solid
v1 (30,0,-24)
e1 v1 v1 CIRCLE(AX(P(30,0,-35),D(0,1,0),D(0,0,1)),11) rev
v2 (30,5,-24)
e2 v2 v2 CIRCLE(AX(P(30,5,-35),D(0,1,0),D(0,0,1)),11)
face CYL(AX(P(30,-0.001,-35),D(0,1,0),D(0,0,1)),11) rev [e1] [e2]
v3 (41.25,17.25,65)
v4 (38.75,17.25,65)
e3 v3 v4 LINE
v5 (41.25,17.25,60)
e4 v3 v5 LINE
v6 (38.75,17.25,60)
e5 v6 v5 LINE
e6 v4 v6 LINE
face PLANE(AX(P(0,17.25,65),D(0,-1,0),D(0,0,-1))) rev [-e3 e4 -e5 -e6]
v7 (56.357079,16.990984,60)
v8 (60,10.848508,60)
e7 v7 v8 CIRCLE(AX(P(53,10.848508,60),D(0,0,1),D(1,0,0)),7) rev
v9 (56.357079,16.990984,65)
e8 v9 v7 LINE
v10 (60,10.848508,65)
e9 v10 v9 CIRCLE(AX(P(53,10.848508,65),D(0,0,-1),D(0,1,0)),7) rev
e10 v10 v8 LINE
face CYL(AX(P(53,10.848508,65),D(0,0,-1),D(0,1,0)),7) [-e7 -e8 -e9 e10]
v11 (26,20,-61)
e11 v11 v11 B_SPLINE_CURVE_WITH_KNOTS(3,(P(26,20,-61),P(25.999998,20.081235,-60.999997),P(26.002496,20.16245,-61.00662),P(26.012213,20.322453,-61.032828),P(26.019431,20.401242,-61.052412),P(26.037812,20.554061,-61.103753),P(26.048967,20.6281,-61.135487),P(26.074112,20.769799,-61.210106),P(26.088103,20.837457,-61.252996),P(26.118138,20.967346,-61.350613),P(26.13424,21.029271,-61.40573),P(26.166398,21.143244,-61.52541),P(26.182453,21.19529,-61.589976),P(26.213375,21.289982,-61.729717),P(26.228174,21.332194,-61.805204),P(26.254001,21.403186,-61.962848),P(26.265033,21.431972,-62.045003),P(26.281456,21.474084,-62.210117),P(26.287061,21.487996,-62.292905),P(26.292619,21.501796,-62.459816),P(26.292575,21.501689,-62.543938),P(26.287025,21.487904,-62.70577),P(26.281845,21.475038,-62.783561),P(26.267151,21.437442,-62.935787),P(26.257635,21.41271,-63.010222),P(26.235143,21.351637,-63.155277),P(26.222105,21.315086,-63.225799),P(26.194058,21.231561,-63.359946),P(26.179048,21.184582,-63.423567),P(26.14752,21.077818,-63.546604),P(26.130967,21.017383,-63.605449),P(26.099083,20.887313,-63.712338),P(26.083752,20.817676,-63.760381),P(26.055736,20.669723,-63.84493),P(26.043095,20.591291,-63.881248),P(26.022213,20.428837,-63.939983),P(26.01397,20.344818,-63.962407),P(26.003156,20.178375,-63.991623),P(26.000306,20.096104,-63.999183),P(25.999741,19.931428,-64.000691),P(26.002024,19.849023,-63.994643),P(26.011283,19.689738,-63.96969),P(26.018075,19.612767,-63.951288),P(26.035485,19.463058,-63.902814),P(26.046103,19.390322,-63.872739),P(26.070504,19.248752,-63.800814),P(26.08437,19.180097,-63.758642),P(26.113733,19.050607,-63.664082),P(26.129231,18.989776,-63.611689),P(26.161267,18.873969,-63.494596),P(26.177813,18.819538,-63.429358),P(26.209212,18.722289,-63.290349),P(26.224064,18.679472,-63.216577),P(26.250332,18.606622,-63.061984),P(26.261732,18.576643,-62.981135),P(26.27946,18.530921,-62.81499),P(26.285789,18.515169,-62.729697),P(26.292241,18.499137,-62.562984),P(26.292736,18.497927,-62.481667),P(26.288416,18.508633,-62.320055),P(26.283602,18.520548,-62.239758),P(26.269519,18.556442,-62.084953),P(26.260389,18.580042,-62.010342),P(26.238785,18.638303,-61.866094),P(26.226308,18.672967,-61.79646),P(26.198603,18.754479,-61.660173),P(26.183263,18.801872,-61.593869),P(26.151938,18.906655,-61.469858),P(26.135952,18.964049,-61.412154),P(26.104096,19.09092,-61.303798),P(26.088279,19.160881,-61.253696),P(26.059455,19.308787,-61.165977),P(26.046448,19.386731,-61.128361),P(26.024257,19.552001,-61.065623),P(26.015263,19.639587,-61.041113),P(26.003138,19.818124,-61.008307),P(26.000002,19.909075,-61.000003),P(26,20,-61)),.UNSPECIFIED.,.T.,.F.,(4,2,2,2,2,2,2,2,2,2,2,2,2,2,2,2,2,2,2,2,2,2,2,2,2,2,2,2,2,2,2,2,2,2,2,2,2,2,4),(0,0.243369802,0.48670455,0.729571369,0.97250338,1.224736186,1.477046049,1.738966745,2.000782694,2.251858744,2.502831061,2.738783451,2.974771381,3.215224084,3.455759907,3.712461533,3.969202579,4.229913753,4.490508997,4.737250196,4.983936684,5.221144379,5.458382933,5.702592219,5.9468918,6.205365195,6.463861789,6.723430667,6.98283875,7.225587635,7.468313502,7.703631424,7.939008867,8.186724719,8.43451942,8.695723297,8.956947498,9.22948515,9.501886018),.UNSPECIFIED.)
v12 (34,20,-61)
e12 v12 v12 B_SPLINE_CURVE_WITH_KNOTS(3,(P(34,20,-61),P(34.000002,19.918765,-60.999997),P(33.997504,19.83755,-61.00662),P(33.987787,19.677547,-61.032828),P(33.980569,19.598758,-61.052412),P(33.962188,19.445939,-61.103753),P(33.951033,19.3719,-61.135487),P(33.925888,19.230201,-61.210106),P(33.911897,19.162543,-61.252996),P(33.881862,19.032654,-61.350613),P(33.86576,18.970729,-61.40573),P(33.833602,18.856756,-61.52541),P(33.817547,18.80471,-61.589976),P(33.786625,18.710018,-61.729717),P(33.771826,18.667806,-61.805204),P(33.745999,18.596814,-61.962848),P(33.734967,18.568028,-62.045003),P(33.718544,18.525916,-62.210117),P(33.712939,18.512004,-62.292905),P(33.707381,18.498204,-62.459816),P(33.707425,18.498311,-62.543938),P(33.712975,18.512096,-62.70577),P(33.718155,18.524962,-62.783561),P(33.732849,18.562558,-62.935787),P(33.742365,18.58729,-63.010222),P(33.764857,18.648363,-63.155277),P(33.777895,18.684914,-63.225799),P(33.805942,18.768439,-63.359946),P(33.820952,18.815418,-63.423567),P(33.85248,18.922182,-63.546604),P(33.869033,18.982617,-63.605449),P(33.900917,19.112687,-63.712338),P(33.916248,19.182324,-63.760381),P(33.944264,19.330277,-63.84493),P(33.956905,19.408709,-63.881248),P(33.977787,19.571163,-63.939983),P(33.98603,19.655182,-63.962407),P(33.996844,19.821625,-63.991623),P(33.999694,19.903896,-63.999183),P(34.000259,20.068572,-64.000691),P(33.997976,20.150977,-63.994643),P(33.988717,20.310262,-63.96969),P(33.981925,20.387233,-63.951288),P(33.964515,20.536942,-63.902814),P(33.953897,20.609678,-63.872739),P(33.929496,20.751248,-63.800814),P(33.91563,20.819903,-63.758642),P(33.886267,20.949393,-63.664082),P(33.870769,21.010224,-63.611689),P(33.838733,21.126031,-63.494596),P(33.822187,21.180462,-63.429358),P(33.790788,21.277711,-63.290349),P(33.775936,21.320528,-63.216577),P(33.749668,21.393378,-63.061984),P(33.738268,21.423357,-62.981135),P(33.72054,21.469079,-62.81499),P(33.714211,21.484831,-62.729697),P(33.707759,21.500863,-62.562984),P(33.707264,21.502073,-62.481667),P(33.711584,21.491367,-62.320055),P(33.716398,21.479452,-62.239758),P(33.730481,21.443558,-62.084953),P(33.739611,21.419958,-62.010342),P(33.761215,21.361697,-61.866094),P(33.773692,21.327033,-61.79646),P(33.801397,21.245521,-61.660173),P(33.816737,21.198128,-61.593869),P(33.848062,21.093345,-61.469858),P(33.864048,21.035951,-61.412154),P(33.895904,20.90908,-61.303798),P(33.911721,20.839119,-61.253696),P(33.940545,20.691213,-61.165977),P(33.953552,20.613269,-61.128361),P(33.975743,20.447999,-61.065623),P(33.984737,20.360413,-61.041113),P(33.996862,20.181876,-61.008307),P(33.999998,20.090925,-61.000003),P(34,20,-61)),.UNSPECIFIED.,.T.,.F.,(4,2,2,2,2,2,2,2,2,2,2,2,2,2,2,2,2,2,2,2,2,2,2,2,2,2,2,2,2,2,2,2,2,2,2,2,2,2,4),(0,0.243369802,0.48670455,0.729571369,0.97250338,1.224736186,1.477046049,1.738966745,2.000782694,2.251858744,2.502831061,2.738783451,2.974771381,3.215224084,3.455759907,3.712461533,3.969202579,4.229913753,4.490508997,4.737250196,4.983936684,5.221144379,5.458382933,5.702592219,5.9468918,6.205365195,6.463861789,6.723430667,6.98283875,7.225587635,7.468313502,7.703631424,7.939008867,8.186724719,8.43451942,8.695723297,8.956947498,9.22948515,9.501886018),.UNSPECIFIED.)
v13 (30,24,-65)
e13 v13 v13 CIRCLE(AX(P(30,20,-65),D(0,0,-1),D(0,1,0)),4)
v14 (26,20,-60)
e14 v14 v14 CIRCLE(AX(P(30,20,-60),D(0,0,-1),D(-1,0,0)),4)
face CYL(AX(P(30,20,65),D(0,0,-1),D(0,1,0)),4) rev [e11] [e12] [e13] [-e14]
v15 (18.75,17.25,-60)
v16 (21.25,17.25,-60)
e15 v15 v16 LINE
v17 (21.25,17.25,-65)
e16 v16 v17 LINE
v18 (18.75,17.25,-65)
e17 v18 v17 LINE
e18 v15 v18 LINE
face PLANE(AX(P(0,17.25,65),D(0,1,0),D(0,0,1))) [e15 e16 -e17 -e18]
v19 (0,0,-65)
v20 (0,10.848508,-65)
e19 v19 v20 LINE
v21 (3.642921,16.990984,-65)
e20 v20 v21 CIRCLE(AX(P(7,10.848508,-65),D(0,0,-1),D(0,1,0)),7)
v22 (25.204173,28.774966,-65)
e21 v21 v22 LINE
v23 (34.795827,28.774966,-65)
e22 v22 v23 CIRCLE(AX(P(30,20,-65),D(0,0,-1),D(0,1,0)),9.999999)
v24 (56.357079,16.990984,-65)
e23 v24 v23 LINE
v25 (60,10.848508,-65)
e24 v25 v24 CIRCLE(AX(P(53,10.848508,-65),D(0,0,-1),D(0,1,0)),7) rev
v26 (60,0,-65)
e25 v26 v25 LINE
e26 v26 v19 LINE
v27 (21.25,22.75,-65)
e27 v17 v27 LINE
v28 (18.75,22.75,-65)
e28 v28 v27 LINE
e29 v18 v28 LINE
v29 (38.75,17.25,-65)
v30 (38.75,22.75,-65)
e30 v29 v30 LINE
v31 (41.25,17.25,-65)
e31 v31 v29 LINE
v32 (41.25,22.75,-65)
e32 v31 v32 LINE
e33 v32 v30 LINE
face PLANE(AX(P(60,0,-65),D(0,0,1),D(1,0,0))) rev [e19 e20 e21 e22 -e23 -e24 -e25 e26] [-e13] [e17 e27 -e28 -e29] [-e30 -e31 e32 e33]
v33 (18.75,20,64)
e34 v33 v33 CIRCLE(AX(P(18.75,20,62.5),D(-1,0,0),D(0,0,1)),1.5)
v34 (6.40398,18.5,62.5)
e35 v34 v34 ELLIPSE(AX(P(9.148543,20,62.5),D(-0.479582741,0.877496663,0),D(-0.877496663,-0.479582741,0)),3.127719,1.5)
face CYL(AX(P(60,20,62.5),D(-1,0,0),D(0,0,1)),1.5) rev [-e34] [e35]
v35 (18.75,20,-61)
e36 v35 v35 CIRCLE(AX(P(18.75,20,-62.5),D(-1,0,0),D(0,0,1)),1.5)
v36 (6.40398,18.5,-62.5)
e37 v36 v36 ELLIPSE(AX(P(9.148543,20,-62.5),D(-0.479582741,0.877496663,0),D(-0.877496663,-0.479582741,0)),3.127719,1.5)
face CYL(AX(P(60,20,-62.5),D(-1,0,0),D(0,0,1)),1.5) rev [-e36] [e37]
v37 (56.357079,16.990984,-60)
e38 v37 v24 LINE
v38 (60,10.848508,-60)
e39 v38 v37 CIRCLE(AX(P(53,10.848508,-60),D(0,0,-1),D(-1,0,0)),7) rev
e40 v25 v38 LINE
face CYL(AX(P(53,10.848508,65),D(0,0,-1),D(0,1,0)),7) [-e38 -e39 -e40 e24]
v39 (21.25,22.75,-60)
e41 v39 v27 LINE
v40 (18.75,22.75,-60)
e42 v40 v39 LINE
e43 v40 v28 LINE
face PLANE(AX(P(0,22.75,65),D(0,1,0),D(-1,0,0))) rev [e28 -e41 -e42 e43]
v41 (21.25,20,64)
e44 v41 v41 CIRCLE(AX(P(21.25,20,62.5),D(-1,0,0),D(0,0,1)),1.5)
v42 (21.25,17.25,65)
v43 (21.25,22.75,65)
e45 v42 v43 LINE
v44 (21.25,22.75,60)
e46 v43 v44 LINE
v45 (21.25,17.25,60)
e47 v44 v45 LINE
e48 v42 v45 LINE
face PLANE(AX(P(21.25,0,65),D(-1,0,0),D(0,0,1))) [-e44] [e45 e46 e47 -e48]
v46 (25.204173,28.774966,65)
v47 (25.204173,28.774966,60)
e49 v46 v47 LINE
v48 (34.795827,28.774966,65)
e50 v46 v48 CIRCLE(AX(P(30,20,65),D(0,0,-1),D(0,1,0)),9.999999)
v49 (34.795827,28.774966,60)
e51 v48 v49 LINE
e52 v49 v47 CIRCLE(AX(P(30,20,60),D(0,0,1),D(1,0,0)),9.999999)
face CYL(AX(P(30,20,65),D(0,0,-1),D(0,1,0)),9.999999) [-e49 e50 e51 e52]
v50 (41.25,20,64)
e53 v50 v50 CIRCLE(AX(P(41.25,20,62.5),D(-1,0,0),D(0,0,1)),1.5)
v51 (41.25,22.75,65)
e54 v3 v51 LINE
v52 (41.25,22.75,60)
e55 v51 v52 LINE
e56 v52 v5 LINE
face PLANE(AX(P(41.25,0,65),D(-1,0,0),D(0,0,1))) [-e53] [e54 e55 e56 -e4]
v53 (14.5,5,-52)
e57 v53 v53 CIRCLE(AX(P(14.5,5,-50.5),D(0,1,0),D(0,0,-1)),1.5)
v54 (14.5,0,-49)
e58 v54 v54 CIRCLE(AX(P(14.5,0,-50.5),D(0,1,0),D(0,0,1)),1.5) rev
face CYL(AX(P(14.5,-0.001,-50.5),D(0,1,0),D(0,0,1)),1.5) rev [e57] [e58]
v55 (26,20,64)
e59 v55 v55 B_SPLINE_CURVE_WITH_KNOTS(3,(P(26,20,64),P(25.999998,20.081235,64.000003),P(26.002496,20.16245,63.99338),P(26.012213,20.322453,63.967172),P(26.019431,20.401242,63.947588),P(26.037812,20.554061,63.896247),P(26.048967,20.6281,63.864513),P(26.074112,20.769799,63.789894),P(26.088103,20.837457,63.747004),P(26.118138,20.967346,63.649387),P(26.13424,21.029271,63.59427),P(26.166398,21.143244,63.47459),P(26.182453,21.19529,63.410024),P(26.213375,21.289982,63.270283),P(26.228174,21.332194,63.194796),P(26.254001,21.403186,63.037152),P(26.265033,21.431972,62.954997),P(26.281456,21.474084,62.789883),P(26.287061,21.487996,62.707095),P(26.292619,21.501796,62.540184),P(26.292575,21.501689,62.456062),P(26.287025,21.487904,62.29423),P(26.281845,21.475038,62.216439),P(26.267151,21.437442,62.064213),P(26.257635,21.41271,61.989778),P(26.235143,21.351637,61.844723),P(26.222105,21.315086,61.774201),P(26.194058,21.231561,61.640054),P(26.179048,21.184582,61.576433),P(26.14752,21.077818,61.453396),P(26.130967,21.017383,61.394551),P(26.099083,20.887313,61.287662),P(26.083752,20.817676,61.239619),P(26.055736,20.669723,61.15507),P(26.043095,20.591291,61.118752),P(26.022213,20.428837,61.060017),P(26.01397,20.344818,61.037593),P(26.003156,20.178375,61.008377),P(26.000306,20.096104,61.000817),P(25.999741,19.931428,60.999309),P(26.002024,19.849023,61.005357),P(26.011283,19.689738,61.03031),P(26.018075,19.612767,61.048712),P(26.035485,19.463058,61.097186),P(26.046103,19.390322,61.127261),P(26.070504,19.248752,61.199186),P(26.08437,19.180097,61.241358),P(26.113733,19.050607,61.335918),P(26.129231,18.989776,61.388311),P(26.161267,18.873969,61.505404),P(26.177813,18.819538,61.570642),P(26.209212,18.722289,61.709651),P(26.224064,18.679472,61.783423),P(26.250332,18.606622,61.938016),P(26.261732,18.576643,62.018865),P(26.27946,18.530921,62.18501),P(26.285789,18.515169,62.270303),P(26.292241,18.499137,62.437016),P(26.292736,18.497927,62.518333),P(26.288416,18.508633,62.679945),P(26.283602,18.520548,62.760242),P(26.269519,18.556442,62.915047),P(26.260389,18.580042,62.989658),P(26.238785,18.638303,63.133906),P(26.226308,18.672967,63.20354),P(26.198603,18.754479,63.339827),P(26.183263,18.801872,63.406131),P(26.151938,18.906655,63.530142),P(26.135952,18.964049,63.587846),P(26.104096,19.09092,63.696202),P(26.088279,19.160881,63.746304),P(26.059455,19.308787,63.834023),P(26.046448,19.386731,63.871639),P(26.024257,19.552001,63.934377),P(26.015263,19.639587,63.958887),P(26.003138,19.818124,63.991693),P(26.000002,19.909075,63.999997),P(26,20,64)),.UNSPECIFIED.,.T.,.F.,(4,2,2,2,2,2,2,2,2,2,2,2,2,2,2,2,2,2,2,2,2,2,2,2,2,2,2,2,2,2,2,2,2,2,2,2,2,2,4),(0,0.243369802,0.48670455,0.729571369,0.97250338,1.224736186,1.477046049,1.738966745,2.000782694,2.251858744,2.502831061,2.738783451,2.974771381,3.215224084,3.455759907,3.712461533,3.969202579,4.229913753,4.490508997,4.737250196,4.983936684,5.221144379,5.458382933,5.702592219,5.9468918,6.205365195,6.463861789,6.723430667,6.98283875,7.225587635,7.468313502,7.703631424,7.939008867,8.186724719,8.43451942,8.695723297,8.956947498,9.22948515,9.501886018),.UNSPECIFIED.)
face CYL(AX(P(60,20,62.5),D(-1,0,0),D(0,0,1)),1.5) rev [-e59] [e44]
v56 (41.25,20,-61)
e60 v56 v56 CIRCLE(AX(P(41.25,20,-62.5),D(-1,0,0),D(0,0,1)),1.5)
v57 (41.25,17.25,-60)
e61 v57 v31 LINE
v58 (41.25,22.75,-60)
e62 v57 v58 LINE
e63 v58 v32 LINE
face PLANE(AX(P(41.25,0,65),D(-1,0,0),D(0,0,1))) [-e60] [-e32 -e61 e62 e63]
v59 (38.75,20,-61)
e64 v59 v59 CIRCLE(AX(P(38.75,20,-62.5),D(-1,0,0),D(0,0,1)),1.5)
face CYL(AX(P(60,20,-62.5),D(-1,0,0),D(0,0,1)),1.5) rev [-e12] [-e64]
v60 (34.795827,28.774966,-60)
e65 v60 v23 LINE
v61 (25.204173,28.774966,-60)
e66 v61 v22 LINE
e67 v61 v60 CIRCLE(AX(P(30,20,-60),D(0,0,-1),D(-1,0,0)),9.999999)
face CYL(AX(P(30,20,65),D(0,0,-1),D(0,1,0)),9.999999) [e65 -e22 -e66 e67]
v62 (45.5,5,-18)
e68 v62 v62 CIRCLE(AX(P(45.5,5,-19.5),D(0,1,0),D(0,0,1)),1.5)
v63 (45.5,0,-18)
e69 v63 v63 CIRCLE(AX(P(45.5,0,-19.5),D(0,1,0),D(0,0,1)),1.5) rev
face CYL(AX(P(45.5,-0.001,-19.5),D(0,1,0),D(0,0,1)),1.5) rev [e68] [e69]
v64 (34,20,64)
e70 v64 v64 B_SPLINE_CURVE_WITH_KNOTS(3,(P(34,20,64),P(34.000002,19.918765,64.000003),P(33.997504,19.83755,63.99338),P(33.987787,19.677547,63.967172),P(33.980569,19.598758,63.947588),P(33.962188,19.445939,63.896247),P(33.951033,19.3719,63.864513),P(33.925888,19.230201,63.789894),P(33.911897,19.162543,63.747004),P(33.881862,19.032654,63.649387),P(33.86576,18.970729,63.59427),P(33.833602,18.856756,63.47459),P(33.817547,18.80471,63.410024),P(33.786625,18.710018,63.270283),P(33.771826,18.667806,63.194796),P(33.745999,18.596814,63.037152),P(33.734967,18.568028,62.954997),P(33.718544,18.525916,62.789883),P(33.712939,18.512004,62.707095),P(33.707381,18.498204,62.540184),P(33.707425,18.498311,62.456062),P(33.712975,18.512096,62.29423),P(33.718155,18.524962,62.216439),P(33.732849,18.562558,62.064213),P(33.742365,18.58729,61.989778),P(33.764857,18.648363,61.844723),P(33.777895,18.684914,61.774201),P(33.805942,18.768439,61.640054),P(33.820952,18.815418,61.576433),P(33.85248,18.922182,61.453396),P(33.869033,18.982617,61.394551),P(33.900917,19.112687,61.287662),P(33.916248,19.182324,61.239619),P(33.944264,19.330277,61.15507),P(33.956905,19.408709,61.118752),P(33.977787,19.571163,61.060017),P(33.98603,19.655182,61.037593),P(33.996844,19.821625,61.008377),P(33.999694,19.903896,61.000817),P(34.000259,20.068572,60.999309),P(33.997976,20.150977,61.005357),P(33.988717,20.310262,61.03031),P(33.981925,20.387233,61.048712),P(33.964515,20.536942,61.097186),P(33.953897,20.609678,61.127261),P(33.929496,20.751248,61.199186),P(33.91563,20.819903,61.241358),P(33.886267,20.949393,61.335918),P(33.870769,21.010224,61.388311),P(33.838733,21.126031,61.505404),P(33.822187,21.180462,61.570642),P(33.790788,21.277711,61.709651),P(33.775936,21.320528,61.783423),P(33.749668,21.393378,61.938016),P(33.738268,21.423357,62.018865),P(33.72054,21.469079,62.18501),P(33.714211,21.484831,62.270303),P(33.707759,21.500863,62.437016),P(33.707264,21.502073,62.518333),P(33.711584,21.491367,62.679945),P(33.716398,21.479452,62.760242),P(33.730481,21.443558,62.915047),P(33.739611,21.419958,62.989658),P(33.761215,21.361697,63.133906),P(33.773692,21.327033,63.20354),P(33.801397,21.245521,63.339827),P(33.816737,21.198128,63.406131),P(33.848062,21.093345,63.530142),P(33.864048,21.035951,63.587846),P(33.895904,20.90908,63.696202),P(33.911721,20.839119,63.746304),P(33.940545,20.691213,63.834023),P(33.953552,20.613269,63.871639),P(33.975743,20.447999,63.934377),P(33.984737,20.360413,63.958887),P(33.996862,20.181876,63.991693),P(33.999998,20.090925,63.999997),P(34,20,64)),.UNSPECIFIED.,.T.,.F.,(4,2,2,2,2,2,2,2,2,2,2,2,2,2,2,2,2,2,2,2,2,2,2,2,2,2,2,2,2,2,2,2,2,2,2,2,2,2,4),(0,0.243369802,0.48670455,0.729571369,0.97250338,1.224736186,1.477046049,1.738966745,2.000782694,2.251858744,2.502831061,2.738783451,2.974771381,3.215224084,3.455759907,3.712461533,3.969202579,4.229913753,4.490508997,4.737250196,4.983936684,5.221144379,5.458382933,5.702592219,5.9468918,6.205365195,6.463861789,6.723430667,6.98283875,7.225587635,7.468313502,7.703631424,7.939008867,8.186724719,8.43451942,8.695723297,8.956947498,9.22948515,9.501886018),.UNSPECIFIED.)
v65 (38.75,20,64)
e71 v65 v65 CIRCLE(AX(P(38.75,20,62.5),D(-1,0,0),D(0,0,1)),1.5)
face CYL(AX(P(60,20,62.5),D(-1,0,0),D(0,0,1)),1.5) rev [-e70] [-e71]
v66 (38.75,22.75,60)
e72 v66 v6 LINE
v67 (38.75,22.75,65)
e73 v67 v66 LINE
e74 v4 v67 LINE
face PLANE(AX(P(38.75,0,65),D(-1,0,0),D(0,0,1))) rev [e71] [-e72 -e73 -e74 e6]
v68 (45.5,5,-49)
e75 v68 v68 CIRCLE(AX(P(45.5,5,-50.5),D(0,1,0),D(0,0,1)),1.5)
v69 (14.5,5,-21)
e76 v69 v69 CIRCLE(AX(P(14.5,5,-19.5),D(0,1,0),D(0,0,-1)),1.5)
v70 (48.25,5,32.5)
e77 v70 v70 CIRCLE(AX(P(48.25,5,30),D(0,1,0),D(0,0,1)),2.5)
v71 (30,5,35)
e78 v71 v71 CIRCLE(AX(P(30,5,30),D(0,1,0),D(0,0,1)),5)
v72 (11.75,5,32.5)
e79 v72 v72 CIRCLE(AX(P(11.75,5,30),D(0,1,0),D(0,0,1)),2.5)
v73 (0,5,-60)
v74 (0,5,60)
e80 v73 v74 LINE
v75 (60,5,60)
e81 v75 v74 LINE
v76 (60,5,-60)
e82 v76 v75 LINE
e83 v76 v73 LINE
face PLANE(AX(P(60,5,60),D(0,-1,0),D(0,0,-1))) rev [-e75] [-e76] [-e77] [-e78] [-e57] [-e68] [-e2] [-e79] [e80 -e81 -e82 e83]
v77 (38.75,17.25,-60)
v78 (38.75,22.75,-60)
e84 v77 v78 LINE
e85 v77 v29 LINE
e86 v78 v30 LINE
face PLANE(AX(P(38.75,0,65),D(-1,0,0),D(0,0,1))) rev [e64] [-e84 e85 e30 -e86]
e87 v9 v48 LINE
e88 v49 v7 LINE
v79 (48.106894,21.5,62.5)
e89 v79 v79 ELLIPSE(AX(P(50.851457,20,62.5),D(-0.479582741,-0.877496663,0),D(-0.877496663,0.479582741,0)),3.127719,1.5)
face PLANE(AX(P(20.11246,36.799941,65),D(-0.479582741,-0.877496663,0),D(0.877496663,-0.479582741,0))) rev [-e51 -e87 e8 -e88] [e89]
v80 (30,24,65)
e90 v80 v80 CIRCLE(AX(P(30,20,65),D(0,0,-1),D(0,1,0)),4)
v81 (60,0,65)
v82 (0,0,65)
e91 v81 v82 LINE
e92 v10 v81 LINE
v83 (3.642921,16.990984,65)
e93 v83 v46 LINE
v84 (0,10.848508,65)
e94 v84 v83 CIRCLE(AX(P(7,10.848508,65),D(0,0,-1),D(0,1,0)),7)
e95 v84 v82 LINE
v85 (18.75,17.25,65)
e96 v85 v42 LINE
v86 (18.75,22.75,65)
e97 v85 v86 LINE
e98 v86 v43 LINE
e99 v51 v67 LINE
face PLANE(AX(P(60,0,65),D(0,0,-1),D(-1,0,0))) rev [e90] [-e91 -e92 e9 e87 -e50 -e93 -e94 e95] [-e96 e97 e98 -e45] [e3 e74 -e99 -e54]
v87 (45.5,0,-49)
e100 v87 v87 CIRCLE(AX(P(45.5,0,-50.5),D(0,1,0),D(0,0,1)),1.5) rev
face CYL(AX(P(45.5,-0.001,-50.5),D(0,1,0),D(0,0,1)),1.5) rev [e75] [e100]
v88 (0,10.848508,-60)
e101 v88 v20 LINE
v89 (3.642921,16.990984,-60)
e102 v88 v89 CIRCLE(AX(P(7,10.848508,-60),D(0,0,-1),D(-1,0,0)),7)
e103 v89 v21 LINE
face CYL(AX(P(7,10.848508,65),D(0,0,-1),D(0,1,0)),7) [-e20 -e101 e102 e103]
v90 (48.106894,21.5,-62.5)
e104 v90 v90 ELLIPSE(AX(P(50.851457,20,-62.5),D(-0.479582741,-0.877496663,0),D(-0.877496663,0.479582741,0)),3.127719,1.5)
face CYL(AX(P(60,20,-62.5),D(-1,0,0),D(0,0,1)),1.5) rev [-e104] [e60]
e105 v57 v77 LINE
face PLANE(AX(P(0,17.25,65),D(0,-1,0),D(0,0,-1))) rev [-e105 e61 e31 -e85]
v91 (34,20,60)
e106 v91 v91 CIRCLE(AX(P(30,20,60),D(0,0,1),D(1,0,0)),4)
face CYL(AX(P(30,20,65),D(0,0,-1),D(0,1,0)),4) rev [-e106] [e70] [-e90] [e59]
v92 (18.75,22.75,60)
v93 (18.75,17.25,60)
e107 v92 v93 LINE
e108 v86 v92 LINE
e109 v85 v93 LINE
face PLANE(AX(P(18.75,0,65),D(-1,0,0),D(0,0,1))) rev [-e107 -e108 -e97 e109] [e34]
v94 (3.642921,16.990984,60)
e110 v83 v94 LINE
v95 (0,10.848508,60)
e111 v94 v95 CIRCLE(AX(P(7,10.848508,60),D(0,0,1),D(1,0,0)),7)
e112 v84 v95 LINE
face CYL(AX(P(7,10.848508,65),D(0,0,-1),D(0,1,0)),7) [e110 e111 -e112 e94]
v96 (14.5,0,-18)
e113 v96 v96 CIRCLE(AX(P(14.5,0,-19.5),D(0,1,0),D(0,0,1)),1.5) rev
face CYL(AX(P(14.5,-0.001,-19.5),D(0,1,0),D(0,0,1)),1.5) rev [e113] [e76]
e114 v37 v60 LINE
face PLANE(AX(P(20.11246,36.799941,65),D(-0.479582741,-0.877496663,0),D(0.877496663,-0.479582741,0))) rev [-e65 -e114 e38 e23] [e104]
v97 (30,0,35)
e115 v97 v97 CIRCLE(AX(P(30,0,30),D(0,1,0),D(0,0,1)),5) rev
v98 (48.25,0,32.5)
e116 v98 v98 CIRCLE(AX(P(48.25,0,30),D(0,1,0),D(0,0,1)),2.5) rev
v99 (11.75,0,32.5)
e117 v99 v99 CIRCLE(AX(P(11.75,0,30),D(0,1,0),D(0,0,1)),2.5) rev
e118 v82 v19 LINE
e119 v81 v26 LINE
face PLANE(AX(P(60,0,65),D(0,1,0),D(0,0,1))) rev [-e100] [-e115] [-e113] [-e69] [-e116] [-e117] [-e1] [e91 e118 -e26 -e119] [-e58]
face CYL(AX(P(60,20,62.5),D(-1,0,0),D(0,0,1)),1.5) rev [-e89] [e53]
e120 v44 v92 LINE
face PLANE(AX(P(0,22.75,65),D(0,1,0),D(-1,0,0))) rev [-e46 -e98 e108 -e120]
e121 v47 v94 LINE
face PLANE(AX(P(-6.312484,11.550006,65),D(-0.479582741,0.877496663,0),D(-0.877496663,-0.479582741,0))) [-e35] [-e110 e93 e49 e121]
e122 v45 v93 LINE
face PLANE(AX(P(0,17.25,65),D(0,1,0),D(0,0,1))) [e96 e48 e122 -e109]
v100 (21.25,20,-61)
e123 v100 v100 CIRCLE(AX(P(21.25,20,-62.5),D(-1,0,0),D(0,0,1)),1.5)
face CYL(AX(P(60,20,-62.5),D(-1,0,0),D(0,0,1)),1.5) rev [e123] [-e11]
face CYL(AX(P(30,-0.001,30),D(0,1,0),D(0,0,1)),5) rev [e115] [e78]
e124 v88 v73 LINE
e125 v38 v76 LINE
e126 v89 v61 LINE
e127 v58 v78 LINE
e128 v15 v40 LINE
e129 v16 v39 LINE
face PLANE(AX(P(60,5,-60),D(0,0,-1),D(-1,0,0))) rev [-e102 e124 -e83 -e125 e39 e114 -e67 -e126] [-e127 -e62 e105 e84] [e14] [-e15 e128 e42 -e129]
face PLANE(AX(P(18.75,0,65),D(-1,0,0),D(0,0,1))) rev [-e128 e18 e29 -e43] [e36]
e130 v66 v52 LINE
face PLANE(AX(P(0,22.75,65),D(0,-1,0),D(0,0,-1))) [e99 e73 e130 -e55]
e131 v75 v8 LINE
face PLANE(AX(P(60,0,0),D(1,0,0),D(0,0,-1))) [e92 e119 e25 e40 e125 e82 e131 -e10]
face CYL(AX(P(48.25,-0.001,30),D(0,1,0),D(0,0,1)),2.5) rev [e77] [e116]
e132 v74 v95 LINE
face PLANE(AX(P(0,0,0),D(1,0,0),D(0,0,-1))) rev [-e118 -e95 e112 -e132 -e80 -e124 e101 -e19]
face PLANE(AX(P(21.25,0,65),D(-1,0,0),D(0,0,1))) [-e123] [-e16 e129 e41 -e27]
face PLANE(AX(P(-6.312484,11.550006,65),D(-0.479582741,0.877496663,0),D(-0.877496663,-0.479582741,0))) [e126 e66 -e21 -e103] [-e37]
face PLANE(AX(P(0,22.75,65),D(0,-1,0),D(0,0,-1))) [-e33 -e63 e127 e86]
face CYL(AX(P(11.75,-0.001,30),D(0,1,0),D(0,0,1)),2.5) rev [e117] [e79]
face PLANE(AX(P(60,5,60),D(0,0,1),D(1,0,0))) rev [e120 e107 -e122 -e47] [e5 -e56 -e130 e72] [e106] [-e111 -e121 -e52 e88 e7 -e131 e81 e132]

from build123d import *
from OCP.BRepAlgoAPI import BRepAlgoAPI_Cut
from OCP.TopTools import TopTools_ListOfShape

# Parameters (mm, degrees)
BOSS_EXTRUDE1_DEPTH    = 60
CUT_EXTRUDE1_START     = -130
CUT_EXTRUDE1_OUTLINE_R = 4
CUT_EXTRUDE1_OUTLINE_W = 2.5
CUT_EXTRUDE1_OUTLINE_H = 5.5
CUT_EXTRUDE1_DEPTH     = 130
CUT_EXTRUDE2_REACH     = 93.924
SKETCH3_R              = 11
SKETCH3_R_2            = 1.5
SKETCH3_R_3            = 5
SKETCH3_R_4            = 2.5
SKETCH4_R              = 1.5
CUT_EXTRUDE3_DEPTH     = 94.407708115


with BuildPart() as part:
    # Sketch1 → Boss-Extrude1 (new body)
    with BuildSketch(Plane(origin=(0, 0, 0), x_dir=(0, 0, -1), z_dir=(1, 0, 0))):
        Polygon((-65, 0), (65, 0), (65, 30), (60, 30), (60, 5), (-60, 5), (-60, 30), (-65, 30), align=None)
    extrude(amount=BOSS_EXTRUDE1_DEPTH)


with BuildPart() as cut_extrude1_tool:
    # Cut-Extrude1: read off the stored shape, not the designer's step
    # Cut-Extrude1 outline → Cut-Extrude1 (new body)
    with BuildSketch(Plane(origin=(0, 0, -65), x_dir=(-1, 0, 0), z_dir=(0, 0, -1)).offset(CUT_EXTRUDE1_START)):
        with BuildLine():
            Line((0, 30), (-30, 29.999998923))
            ThreePointArc((-30, 29.999998923), (-27.525092827, 29.688901535), (-25.204173103, 28.774965689))
            Line((-25.204173103, 28.774965689), (-3.642920811, 16.99098415))
            ThreePointArc((-3.642920811, 16.99098415), (-0.979221216, 14.419252925), (0, 10.848507507))
            Line((0, 10.848507507), (0, 30))
        make_face()
        with BuildLine():
            ThreePointArc((-60, 10.848507507), (-59.020778784, 14.419252925), (-56.357079189, 16.99098415))
            Line((-56.357079189, 16.99098415), (-34.795826897, 28.774965689))
            ThreePointArc((-34.795826897, 28.774965689), (-32.474907173, 29.688901535), (-30, 29.999998923))
            Line((-30, 29.999998923), (-60, 30))
            Line((-60, 30), (-60, 10.848507507))
        make_face()
        with Locations((-30, 20)):
            Circle(CUT_EXTRUDE1_OUTLINE_R)
        with Locations((-20, 20)):
            Rectangle(CUT_EXTRUDE1_OUTLINE_W, CUT_EXTRUDE1_OUTLINE_H)
        with Locations((-40, 20)):
            Rectangle(CUT_EXTRUDE1_OUTLINE_W, CUT_EXTRUDE1_OUTLINE_H)
    extrude(amount=CUT_EXTRUDE1_DEPTH)


with BuildPart() as part_1:
    add(part.part)

    # Cut-Extrude1: cut by cut_extrude1_tool, with a tolerance
    cut_extrude1_stock = TopTools_ListOfShape()
    cut_extrude1_stock.Append(part_1.part.wrapped)
    cut_extrude1_tools = TopTools_ListOfShape()
    cut_extrude1_tools.Append(cut_extrude1_tool.part.wrapped)
    cut_extrude1_cut = BRepAlgoAPI_Cut()
    cut_extrude1_cut.SetArguments(cut_extrude1_stock)
    cut_extrude1_cut.SetTools(cut_extrude1_tools)
    cut_extrude1_cut.SetFuzzyValue(0.00001)
    cut_extrude1_cut.Build()
    add(Compound.cast(cut_extrude1_cut.Shape()).solids(), mode=Mode.REPLACE)

    # Sketch3 → Cut-Extrude2 (cut, up to next)
    with BuildSketch(Plane(origin=(0, 5, 0), x_dir=(1, 0, 0), z_dir=(0, 1, 0)), mode=Mode.PRIVATE) as cut_extrude2_sk1:
        with Locations(Location((30, 35, 0), (0, 0, 270))):
            Circle(SKETCH3_R)
    cut_extrude2_tool1 = extrude(cut_extrude2_sk1.sketch, amount=-CUT_EXTRUDE2_REACH, mode=Mode.PRIVATE) & part_1.part
    # Sketch3 → Cut-Extrude2 (cut, up to next)
    with BuildSketch(Plane(origin=(0, 5, 0), x_dir=(1, 0, 0), z_dir=(0, 1, 0)), mode=Mode.PRIVATE) as cut_extrude2_sk2:
        with Locations(Location((45.5, 19.5, 0), (0, 0, 270))):
            Circle(SKETCH3_R_2)
    cut_extrude2_tool2 = extrude(cut_extrude2_sk2.sketch, amount=-CUT_EXTRUDE2_REACH, mode=Mode.PRIVATE) & part_1.part
    # Sketch3 → Cut-Extrude2 (cut, up to next)
    with BuildSketch(Plane(origin=(0, 5, 0), x_dir=(1, 0, 0), z_dir=(0, 1, 0)), mode=Mode.PRIVATE) as cut_extrude2_sk3:
        with Locations(Location((45.5, 50.5, 0), (0, 0, 270))):
            Circle(SKETCH3_R_2)
    cut_extrude2_tool3 = extrude(cut_extrude2_sk3.sketch, amount=-CUT_EXTRUDE2_REACH, mode=Mode.PRIVATE) & part_1.part
    # Sketch3 → Cut-Extrude2 (cut, up to next)
    with BuildSketch(Plane(origin=(0, 5, 0), x_dir=(1, 0, 0), z_dir=(0, 1, 0)), mode=Mode.PRIVATE) as cut_extrude2_sk4:
        with Locations(Location((14.5, 50.5, 0), (0, 0, 270))):
            Circle(SKETCH3_R_2)
    cut_extrude2_tool4 = extrude(cut_extrude2_sk4.sketch, amount=-CUT_EXTRUDE2_REACH, mode=Mode.PRIVATE) & part_1.part
    # Sketch3 → Cut-Extrude2 (cut, up to next)
    with BuildSketch(Plane(origin=(0, 5, 0), x_dir=(1, 0, 0), z_dir=(0, 1, 0)), mode=Mode.PRIVATE) as cut_extrude2_sk5:
        with Locations(Location((14.5, 19.5, 0), (0, 0, 270))):
            Circle(SKETCH3_R_2)
    cut_extrude2_tool5 = extrude(cut_extrude2_sk5.sketch, amount=-CUT_EXTRUDE2_REACH, mode=Mode.PRIVATE) & part_1.part
    # Sketch3 → Cut-Extrude2 (cut, up to next)
    with BuildSketch(Plane(origin=(0, 5, 0), x_dir=(1, 0, 0), z_dir=(0, 1, 0)), mode=Mode.PRIVATE) as cut_extrude2_sk6:
        with Locations(Location((30, -30, 0), (0, 0, 270))):
            Circle(SKETCH3_R_3)
    cut_extrude2_tool6 = extrude(cut_extrude2_sk6.sketch, amount=-CUT_EXTRUDE2_REACH, mode=Mode.PRIVATE) & part_1.part
    # Sketch3 → Cut-Extrude2 (cut, up to next)
    with BuildSketch(Plane(origin=(0, 5, 0), x_dir=(1, 0, 0), z_dir=(0, 1, 0)), mode=Mode.PRIVATE) as cut_extrude2_sk7:
        with Locations(Location((48.25, -30, 0), (0, 0, 270))):
            Circle(SKETCH3_R_4)
    cut_extrude2_tool7 = extrude(cut_extrude2_sk7.sketch, amount=-CUT_EXTRUDE2_REACH, mode=Mode.PRIVATE) & part_1.part
    # Sketch3 → Cut-Extrude2 (cut, up to next)
    with BuildSketch(Plane(origin=(0, 5, 0), x_dir=(1, 0, 0), z_dir=(0, 1, 0)), mode=Mode.PRIVATE) as cut_extrude2_sk8:
        with Locations(Location((11.75, -30, 0), (0, 0, 270))):
            Circle(SKETCH3_R_4)
    cut_extrude2_tool8 = extrude(cut_extrude2_sk8.sketch, amount=-CUT_EXTRUDE2_REACH, mode=Mode.PRIVATE) & part_1.part
    add(cut_extrude2_tool1.solids().sort_by_distance((30, 5, -35))[0], mode=Mode.SUBTRACT)
    add(cut_extrude2_tool2.solids().sort_by_distance((45.5, 5, -19.5))[0], mode=Mode.SUBTRACT)
    add(cut_extrude2_tool3.solids().sort_by_distance((45.5, 5, -50.5))[0], mode=Mode.SUBTRACT)
    add(cut_extrude2_tool4.solids().sort_by_distance((14.5, 5, -50.5))[0], mode=Mode.SUBTRACT)
    add(cut_extrude2_tool5.solids().sort_by_distance((14.5, 5, -19.5))[0], mode=Mode.SUBTRACT)
    add(cut_extrude2_tool6.solids().sort_by_distance((30, 5, 30))[0], mode=Mode.SUBTRACT)
    add(cut_extrude2_tool7.solids().sort_by_distance((48.25, 5, 30))[0], mode=Mode.SUBTRACT)
    add(cut_extrude2_tool8.solids().sort_by_distance((11.75, 5, 30))[0], mode=Mode.SUBTRACT)

    # Sketch4 → Cut-Extrude3 (cut, through all)
    with BuildSketch(Plane.ZY):
        with Locations((62.5, 20)):
            Circle(SKETCH4_R)
        with Locations((-62.5, 20)):
            Circle(SKETCH4_R)
    extrude(amount=-CUT_EXTRUDE3_DEPTH, mode=Mode.SUBTRACT)


solid = part_1.part
